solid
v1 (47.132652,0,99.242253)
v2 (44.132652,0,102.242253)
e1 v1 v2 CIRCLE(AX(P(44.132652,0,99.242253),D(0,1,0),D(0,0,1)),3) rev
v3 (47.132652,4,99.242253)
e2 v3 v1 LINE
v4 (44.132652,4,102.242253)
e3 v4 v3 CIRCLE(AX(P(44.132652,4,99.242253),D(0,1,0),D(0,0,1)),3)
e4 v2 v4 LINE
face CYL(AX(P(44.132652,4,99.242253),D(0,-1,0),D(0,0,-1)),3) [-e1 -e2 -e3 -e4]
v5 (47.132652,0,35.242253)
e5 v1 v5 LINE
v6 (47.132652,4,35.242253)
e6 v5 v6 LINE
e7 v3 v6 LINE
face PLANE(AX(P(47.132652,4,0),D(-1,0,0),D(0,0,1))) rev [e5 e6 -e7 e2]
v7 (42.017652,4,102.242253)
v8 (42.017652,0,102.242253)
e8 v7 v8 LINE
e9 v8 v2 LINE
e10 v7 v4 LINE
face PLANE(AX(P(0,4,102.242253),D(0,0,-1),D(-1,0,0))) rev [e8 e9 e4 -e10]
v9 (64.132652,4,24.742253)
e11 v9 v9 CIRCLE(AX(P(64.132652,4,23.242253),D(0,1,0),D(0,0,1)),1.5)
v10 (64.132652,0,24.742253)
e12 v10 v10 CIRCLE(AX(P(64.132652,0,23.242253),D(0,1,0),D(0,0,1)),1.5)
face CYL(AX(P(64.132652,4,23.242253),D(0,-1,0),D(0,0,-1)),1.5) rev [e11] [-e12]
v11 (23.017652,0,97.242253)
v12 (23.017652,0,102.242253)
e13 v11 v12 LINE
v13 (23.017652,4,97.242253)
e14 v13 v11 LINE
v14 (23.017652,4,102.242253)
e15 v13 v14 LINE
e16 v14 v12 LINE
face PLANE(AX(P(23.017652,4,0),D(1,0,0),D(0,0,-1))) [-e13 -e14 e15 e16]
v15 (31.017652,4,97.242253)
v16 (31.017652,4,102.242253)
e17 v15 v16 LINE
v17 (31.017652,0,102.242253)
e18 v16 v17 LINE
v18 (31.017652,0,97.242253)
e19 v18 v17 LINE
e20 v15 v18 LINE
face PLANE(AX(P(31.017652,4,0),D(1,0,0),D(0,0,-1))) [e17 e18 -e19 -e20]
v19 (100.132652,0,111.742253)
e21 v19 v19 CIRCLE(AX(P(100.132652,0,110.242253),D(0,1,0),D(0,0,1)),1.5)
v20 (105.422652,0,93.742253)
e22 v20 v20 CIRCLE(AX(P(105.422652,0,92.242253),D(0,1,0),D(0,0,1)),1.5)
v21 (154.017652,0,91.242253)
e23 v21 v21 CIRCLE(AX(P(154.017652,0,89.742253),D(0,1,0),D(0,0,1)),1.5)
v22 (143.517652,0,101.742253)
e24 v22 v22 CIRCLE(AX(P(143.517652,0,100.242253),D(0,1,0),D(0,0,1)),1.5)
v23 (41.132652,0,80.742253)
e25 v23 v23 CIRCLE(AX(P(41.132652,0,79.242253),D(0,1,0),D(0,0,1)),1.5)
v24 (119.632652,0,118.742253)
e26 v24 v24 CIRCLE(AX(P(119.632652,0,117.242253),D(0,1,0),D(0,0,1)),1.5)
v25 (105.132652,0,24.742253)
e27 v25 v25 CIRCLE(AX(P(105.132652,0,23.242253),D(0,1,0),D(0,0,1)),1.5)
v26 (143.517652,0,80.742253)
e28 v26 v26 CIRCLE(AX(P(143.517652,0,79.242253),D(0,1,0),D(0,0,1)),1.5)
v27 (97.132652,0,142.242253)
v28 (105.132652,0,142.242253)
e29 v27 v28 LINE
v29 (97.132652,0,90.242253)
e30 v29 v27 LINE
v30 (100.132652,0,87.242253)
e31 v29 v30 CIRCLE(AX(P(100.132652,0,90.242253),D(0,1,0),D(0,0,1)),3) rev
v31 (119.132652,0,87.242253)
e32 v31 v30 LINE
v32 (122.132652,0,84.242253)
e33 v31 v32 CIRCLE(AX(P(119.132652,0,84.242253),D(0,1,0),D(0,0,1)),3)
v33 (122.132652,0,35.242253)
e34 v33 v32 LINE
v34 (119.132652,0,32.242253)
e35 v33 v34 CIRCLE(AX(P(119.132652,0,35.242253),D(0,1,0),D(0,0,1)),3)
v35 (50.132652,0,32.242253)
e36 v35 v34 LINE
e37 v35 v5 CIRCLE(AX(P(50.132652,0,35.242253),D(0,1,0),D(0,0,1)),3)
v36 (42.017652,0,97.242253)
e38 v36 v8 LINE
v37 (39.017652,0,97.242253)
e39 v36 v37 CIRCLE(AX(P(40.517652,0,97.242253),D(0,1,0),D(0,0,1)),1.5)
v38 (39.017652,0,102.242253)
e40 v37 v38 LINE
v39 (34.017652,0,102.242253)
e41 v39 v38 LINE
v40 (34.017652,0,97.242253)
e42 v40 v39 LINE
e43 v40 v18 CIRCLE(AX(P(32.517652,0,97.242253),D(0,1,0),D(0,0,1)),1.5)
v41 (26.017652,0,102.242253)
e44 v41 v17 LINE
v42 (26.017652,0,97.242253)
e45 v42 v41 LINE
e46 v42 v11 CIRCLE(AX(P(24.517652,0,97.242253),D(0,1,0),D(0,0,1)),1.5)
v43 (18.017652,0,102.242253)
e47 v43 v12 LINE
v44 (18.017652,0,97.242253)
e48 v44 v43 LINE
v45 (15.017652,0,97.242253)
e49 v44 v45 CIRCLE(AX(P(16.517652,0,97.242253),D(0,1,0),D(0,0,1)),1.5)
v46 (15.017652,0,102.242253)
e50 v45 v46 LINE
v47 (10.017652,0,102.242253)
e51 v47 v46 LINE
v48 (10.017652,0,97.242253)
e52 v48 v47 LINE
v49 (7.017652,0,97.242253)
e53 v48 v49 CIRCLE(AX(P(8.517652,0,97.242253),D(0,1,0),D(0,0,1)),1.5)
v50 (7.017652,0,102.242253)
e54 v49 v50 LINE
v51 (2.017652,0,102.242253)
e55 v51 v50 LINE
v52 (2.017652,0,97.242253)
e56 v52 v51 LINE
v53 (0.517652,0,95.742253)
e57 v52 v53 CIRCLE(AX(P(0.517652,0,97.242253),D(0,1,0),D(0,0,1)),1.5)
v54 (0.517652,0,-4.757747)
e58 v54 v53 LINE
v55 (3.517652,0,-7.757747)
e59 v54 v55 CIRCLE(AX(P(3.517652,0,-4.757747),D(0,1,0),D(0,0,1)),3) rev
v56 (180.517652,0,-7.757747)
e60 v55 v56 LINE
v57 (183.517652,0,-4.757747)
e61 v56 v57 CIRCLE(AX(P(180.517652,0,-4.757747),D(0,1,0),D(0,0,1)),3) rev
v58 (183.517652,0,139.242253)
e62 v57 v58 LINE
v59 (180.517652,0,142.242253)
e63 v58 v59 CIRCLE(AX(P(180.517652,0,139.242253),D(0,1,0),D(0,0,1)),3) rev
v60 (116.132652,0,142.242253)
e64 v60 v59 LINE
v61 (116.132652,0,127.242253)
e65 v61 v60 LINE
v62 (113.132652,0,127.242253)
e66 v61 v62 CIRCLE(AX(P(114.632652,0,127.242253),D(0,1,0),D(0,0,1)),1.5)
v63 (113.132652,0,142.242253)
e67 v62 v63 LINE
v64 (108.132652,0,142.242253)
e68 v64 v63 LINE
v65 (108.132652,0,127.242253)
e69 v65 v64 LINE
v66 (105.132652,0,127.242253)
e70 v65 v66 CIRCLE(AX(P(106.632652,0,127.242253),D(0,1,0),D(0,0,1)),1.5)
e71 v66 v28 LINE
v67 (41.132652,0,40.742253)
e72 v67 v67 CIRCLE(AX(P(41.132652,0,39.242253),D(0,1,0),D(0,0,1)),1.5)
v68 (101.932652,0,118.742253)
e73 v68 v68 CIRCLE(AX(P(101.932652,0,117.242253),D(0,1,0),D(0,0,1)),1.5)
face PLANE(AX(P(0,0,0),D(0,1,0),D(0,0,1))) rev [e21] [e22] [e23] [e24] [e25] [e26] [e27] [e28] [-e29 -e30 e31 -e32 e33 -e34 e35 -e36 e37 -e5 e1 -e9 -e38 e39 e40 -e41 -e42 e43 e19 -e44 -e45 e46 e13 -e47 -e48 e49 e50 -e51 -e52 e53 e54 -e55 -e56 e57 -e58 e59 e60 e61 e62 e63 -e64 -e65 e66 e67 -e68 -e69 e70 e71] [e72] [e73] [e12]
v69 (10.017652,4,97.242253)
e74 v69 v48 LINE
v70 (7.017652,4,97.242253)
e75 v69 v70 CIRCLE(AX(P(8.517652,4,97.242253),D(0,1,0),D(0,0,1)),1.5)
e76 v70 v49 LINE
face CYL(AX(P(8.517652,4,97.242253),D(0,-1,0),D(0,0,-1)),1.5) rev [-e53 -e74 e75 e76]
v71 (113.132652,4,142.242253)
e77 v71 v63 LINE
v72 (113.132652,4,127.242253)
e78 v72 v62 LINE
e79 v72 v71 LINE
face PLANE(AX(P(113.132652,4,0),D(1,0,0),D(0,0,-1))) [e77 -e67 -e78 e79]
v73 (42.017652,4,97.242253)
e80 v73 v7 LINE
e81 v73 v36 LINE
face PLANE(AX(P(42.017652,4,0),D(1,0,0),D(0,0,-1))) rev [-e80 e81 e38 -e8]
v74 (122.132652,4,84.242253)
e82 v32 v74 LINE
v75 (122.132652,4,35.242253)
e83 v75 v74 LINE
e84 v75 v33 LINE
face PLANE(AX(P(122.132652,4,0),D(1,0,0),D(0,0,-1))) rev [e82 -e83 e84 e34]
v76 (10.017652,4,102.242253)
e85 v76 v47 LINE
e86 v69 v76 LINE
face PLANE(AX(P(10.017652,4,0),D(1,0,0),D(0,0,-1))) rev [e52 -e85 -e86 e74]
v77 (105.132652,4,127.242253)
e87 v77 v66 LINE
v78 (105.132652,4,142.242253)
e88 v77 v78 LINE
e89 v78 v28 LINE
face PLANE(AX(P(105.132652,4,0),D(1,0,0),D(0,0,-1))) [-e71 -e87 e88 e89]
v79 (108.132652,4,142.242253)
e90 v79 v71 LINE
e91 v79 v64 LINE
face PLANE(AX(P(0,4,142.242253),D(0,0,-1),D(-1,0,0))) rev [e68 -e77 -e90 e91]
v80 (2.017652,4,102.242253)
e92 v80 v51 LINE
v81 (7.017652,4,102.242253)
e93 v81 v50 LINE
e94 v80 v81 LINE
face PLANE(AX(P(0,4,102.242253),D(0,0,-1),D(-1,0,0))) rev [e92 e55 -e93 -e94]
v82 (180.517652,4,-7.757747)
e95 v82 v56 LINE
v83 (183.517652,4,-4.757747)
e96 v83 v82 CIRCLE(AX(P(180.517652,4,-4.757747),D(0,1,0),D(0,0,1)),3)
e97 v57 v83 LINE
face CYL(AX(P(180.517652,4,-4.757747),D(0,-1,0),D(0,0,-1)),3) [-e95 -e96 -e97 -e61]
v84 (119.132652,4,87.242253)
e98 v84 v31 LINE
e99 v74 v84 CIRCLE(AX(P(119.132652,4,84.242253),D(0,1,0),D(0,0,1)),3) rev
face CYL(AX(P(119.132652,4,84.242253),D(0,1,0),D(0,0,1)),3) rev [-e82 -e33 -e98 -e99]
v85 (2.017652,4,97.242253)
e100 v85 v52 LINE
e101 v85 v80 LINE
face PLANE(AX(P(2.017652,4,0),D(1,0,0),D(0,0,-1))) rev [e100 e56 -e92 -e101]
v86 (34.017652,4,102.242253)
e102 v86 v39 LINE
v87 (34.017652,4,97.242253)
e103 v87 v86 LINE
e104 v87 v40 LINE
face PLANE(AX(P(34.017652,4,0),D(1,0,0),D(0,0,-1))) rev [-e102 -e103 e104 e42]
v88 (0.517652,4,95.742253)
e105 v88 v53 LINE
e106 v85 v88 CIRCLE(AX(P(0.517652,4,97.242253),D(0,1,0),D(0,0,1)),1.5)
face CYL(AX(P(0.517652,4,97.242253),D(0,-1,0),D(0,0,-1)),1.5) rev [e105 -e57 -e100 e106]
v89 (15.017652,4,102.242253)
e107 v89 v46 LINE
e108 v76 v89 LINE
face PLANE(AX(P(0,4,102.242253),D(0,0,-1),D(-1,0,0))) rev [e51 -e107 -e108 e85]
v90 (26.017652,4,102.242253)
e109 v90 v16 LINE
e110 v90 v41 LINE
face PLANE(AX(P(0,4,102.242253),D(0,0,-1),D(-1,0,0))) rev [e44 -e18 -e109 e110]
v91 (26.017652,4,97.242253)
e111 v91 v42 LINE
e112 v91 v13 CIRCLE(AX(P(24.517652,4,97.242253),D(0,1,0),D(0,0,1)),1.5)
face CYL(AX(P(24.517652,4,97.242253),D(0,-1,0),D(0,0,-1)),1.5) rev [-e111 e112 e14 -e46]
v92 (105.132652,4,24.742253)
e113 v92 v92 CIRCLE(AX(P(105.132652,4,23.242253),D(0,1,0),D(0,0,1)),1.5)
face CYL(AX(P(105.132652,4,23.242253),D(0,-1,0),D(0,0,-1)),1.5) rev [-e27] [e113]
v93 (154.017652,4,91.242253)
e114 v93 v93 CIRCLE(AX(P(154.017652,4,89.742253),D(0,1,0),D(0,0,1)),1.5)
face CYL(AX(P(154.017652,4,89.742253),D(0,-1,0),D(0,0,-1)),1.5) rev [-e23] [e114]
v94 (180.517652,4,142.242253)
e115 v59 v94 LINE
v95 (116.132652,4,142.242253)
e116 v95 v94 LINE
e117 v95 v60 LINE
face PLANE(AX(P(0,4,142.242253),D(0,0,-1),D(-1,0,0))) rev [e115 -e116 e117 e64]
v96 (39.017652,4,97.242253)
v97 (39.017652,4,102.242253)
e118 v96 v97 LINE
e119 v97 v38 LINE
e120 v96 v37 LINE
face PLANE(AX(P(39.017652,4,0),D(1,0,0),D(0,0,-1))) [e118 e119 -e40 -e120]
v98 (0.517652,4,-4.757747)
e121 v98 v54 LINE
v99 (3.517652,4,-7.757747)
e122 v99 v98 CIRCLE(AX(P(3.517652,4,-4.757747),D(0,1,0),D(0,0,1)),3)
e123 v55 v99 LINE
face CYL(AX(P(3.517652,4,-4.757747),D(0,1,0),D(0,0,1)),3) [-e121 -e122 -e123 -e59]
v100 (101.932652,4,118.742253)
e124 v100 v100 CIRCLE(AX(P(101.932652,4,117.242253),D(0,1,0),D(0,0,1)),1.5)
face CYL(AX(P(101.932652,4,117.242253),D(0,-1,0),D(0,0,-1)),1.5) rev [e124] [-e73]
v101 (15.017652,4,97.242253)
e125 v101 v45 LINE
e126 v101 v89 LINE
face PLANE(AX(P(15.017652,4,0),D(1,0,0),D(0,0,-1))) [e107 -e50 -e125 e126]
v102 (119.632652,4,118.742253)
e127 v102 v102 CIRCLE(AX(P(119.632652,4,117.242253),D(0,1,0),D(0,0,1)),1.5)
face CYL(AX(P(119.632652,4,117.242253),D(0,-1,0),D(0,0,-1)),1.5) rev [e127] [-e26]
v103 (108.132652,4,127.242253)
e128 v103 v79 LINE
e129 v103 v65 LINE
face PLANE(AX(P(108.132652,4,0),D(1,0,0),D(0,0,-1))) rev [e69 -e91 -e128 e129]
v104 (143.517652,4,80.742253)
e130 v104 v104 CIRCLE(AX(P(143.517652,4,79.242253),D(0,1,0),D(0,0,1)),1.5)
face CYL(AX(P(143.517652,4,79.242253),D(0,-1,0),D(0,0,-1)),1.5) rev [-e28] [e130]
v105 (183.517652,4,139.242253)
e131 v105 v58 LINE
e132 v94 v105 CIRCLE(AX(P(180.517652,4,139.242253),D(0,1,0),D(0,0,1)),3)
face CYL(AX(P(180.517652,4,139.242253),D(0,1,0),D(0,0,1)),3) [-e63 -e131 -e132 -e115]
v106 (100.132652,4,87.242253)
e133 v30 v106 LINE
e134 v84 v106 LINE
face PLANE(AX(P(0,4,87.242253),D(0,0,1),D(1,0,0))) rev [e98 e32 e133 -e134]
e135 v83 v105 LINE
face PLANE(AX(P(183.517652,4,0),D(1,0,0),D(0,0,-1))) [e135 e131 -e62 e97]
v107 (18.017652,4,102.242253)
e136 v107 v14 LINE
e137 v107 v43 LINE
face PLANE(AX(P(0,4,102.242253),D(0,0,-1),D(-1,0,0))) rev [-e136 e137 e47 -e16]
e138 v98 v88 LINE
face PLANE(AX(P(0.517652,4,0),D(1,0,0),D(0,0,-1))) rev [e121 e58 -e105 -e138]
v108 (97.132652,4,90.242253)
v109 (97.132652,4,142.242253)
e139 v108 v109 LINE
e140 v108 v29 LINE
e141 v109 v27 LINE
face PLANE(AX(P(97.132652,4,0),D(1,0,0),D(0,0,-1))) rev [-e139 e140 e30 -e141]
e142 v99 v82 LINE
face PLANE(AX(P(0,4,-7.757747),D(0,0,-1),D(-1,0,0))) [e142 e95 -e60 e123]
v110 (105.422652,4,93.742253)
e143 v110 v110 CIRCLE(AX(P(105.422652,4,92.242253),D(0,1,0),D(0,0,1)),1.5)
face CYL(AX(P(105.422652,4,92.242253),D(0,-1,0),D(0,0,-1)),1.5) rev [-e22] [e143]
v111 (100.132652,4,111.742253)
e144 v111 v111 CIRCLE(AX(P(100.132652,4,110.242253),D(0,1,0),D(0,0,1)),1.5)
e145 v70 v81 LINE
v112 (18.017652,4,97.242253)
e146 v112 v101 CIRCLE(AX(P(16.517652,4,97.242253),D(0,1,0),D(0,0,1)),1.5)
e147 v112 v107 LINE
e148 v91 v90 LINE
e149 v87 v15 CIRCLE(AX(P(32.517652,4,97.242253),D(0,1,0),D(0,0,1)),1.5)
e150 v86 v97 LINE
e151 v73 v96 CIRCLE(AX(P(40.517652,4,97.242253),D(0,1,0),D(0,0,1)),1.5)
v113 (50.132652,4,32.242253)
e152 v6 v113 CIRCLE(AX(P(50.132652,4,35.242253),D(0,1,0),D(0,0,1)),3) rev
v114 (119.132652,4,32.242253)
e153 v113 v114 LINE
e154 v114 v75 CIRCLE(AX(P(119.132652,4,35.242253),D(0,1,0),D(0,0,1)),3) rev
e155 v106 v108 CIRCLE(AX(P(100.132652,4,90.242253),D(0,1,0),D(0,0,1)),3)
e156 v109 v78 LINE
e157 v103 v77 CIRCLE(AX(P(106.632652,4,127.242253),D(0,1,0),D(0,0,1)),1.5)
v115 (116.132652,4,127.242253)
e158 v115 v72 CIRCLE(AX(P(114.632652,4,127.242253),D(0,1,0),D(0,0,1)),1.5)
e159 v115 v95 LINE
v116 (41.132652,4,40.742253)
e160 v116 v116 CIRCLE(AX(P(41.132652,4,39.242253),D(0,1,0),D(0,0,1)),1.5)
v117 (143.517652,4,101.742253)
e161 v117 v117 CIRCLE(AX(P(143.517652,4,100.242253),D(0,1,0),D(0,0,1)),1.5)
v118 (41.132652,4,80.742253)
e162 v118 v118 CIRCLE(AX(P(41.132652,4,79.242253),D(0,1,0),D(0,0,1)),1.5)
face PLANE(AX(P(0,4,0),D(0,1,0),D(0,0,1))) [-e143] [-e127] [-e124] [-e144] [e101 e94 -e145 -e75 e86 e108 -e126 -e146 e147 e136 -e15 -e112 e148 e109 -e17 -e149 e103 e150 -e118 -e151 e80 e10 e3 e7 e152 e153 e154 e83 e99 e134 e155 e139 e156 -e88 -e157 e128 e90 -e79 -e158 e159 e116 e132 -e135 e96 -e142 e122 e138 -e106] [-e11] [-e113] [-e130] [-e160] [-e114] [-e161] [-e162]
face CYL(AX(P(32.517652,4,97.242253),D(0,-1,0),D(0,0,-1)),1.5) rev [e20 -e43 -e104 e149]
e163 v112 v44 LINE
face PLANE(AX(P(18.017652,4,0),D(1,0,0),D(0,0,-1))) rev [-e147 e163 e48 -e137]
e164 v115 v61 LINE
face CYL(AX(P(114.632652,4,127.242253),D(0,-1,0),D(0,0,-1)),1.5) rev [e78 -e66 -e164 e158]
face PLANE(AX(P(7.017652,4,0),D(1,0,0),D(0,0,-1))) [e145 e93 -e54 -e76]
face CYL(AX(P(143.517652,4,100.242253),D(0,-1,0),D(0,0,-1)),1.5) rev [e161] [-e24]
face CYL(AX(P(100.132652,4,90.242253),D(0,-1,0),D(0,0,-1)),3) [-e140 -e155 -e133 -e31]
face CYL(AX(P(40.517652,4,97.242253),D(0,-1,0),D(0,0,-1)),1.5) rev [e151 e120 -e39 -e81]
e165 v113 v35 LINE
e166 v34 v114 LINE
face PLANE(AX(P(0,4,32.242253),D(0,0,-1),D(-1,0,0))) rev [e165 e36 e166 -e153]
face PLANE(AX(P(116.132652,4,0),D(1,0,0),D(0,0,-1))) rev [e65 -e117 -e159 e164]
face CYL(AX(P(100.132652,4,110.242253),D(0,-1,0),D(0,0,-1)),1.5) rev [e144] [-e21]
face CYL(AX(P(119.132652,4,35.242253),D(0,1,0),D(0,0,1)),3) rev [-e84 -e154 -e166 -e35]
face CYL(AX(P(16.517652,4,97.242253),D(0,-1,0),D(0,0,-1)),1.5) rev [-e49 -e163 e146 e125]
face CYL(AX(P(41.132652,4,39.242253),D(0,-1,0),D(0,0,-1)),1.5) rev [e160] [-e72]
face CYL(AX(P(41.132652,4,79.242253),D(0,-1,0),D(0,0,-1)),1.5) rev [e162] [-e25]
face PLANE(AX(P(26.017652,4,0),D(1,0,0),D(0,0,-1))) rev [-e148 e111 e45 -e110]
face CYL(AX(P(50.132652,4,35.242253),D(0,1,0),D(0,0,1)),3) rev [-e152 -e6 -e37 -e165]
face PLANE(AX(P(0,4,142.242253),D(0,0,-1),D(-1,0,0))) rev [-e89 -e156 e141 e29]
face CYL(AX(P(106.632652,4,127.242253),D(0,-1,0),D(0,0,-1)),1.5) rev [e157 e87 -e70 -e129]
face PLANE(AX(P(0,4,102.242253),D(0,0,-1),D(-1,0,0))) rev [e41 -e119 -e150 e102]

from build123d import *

# Parameters (mm, degrees)
SKETCH_1_R      = 1.5
EXTRUDE_3_DEPTH = 4
SKETCH_1_8_W    = 25
SKETCH_1_8_H    = 150
EXTRUDE_4_DEPTH = 4
FILLET_1_R      = 3


with BuildPart() as part:
    # 草图1 → 凸台-拉伸3 (new body)
    with BuildSketch(Plane(origin=(0, 0, 0), x_dir=(1, 0, 0), z_dir=(0, 1, 0))):
        with BuildLine():
            Line((97.132652086, -142.242252719), (105.132652086, -142.242252719))
            Line((105.132652086, -142.242252719), (105.132652086, -127.242252719))
            ThreePointArc((105.132652086, -127.242252719), (106.632652086, -125.742252719), (108.132652086, -127.242252719))
            Line((108.132652086, -127.242252719), (108.132652086, -142.242252719))
            Line((108.132652086, -142.242252719), (113.132652086, -142.242252719))
            Line((113.132652086, -142.242252719), (113.132652086, -127.242252719))
            ThreePointArc((113.132652086, -127.242252719), (114.632652086, -125.742252719), (116.132652086, -127.242252719))
            Line((116.132652086, -127.242252719), (116.132652086, -142.242252719))
            Line((116.132652086, -142.242252719), (158.517652086, -142.242252719))
            Line((158.517652086, -142.242252719), (158.517652086, 7.757747281))
            Line((158.517652086, 7.757747281), (0.517652086, 7.757747281))
            Line((0.517652086, 7.757747281), (0.517652086, -95.742252719))
            ThreePointArc((0.517652086, -95.742252719), (1.578312257, -96.181592547), (2.017652086, -97.242252719))
            Line((2.017652086, -97.242252719), (2.017652086, -102.242252719))
            Line((2.017652086, -102.242252719), (7.017652086, -102.242252719))
            Line((7.017652086, -102.242252719), (7.017652086, -97.242252719))
            ThreePointArc((7.017652086, -97.242252719), (8.517652086, -95.742252719), (10.017652086, -97.242252719))
            Line((10.017652086, -97.242252719), (10.017652086, -102.242252719))
            Line((10.017652086, -102.242252719), (15.017652086, -102.242252719))
            Line((15.017652086, -102.242252719), (15.017652086, -97.242252719))
            ThreePointArc((15.017652086, -97.242252719), (16.517652086, -95.742252719), (18.017652086, -97.242252719))
            Line((18.017652086, -97.242252719), (18.017652086, -102.242252719))
            Line((18.017652086, -102.242252719), (23.017652086, -102.242252719))
            Line((23.017652086, -102.242252719), (23.017652086, -97.242252719))
            ThreePointArc((23.017652086, -97.242252719), (24.517652086, -95.742252719), (26.017652086, -97.242252719))
            Line((26.017652086, -97.242252719), (26.017652086, -102.242252719))
            Line((26.017652086, -102.242252719), (31.017652086, -102.242252719))
            Line((31.017652086, -102.242252719), (31.017652086, -97.242252719))
            ThreePointArc((31.017652086, -97.242252719), (32.517652086, -95.742252719), (34.017652086, -97.242252719))
            Line((34.017652086, -97.242252719), (34.017652086, -102.242252719))
            Line((34.017652086, -102.242252719), (39.017652086, -102.242252719))
            Line((39.017652086, -102.242252719), (39.017652086, -97.242252719))
            ThreePointArc((39.017652086, -97.242252719), (40.517652086, -95.742252719), (42.017652086, -97.242252719))
            Line((42.017652086, -97.242252719), (42.017652086, -102.242252719))
            Line((42.017652086, -102.242252719), (47.132652086, -102.242252719))
            Line((47.132652086, -102.242252719), (47.132652086, -32.242252719))
            Line((47.132652086, -32.242252719), (122.132652086, -32.242252719))
            Line((122.132652086, -32.242252719), (122.132652086, -87.242252719))
            Line((122.132652086, -87.242252719), (97.132652086, -87.242252719))
            Line((97.132652086, -87.242252719), (97.132652086, -142.242252719))
        make_face()
        with Locations((101.932652086, -117.242252719)):
            Circle(SKETCH_1_R, mode=Mode.SUBTRACT)
        with Locations((119.632652086, -117.242252719)):
            Circle(SKETCH_1_R, mode=Mode.SUBTRACT)
        with Locations((105.422652086, -92.242252719)):
            Circle(SKETCH_1_R, mode=Mode.SUBTRACT)
        with Locations((100.132652086, -110.242252719)):
            Circle(SKETCH_1_R, mode=Mode.SUBTRACT)
        with Locations((105.132652086, -23.242252719)):
            Circle(SKETCH_1_R, mode=Mode.SUBTRACT)
        with Locations((41.132652086, -79.242252719)):
            Circle(SKETCH_1_R, mode=Mode.SUBTRACT)
        with Locations((143.517652086, -100.242252719)):
            Circle(SKETCH_1_R, mode=Mode.SUBTRACT)
        with Locations((154.017652086, -89.742252719)):
            Circle(SKETCH_1_R, mode=Mode.SUBTRACT)
        with Locations((143.517652086, -79.242252719)):
            Circle(SKETCH_1_R, mode=Mode.SUBTRACT)
        with Locations((41.132652086, -39.242252719)):
            Circle(SKETCH_1_R, mode=Mode.SUBTRACT)
        with Locations((64.132652086, -23.242252719)):
            Circle(SKETCH_1_R, mode=Mode.SUBTRACT)
    extrude(amount=EXTRUDE_3_DEPTH)

    # 草图1<8> → 凸台-拉伸4 (add)
    with BuildSketch(Plane(origin=(0, 0, 0), x_dir=(1, 0, 0), z_dir=(0, 1, 0))):
        with Locations((171.017652086, -67.242252719)):
            Rectangle(SKETCH_1_8_W, SKETCH_1_8_H)
    extrude(amount=EXTRUDE_4_DEPTH)

    # 圆角1
    fillet_1_edges = [part.edges().sort_by_distance(p)[0] for p in [
        (47.132652086, 2, 32.242252719),
        (122.132652086, 2, 32.242252719),
        (122.132652086, 2, 87.242252719),
        (97.132652086, 2, 87.242252719),
        (47.132652086, 2, 102.242252719),
        (183.517652086, 2, -7.757747281),
        (0.517652086, 2, -7.757747281),
        (183.517652086, 2, 142.242252719),
    ]]
    fillet(fillet_1_edges, radius=FILLET_1_R)


solid = part.part
